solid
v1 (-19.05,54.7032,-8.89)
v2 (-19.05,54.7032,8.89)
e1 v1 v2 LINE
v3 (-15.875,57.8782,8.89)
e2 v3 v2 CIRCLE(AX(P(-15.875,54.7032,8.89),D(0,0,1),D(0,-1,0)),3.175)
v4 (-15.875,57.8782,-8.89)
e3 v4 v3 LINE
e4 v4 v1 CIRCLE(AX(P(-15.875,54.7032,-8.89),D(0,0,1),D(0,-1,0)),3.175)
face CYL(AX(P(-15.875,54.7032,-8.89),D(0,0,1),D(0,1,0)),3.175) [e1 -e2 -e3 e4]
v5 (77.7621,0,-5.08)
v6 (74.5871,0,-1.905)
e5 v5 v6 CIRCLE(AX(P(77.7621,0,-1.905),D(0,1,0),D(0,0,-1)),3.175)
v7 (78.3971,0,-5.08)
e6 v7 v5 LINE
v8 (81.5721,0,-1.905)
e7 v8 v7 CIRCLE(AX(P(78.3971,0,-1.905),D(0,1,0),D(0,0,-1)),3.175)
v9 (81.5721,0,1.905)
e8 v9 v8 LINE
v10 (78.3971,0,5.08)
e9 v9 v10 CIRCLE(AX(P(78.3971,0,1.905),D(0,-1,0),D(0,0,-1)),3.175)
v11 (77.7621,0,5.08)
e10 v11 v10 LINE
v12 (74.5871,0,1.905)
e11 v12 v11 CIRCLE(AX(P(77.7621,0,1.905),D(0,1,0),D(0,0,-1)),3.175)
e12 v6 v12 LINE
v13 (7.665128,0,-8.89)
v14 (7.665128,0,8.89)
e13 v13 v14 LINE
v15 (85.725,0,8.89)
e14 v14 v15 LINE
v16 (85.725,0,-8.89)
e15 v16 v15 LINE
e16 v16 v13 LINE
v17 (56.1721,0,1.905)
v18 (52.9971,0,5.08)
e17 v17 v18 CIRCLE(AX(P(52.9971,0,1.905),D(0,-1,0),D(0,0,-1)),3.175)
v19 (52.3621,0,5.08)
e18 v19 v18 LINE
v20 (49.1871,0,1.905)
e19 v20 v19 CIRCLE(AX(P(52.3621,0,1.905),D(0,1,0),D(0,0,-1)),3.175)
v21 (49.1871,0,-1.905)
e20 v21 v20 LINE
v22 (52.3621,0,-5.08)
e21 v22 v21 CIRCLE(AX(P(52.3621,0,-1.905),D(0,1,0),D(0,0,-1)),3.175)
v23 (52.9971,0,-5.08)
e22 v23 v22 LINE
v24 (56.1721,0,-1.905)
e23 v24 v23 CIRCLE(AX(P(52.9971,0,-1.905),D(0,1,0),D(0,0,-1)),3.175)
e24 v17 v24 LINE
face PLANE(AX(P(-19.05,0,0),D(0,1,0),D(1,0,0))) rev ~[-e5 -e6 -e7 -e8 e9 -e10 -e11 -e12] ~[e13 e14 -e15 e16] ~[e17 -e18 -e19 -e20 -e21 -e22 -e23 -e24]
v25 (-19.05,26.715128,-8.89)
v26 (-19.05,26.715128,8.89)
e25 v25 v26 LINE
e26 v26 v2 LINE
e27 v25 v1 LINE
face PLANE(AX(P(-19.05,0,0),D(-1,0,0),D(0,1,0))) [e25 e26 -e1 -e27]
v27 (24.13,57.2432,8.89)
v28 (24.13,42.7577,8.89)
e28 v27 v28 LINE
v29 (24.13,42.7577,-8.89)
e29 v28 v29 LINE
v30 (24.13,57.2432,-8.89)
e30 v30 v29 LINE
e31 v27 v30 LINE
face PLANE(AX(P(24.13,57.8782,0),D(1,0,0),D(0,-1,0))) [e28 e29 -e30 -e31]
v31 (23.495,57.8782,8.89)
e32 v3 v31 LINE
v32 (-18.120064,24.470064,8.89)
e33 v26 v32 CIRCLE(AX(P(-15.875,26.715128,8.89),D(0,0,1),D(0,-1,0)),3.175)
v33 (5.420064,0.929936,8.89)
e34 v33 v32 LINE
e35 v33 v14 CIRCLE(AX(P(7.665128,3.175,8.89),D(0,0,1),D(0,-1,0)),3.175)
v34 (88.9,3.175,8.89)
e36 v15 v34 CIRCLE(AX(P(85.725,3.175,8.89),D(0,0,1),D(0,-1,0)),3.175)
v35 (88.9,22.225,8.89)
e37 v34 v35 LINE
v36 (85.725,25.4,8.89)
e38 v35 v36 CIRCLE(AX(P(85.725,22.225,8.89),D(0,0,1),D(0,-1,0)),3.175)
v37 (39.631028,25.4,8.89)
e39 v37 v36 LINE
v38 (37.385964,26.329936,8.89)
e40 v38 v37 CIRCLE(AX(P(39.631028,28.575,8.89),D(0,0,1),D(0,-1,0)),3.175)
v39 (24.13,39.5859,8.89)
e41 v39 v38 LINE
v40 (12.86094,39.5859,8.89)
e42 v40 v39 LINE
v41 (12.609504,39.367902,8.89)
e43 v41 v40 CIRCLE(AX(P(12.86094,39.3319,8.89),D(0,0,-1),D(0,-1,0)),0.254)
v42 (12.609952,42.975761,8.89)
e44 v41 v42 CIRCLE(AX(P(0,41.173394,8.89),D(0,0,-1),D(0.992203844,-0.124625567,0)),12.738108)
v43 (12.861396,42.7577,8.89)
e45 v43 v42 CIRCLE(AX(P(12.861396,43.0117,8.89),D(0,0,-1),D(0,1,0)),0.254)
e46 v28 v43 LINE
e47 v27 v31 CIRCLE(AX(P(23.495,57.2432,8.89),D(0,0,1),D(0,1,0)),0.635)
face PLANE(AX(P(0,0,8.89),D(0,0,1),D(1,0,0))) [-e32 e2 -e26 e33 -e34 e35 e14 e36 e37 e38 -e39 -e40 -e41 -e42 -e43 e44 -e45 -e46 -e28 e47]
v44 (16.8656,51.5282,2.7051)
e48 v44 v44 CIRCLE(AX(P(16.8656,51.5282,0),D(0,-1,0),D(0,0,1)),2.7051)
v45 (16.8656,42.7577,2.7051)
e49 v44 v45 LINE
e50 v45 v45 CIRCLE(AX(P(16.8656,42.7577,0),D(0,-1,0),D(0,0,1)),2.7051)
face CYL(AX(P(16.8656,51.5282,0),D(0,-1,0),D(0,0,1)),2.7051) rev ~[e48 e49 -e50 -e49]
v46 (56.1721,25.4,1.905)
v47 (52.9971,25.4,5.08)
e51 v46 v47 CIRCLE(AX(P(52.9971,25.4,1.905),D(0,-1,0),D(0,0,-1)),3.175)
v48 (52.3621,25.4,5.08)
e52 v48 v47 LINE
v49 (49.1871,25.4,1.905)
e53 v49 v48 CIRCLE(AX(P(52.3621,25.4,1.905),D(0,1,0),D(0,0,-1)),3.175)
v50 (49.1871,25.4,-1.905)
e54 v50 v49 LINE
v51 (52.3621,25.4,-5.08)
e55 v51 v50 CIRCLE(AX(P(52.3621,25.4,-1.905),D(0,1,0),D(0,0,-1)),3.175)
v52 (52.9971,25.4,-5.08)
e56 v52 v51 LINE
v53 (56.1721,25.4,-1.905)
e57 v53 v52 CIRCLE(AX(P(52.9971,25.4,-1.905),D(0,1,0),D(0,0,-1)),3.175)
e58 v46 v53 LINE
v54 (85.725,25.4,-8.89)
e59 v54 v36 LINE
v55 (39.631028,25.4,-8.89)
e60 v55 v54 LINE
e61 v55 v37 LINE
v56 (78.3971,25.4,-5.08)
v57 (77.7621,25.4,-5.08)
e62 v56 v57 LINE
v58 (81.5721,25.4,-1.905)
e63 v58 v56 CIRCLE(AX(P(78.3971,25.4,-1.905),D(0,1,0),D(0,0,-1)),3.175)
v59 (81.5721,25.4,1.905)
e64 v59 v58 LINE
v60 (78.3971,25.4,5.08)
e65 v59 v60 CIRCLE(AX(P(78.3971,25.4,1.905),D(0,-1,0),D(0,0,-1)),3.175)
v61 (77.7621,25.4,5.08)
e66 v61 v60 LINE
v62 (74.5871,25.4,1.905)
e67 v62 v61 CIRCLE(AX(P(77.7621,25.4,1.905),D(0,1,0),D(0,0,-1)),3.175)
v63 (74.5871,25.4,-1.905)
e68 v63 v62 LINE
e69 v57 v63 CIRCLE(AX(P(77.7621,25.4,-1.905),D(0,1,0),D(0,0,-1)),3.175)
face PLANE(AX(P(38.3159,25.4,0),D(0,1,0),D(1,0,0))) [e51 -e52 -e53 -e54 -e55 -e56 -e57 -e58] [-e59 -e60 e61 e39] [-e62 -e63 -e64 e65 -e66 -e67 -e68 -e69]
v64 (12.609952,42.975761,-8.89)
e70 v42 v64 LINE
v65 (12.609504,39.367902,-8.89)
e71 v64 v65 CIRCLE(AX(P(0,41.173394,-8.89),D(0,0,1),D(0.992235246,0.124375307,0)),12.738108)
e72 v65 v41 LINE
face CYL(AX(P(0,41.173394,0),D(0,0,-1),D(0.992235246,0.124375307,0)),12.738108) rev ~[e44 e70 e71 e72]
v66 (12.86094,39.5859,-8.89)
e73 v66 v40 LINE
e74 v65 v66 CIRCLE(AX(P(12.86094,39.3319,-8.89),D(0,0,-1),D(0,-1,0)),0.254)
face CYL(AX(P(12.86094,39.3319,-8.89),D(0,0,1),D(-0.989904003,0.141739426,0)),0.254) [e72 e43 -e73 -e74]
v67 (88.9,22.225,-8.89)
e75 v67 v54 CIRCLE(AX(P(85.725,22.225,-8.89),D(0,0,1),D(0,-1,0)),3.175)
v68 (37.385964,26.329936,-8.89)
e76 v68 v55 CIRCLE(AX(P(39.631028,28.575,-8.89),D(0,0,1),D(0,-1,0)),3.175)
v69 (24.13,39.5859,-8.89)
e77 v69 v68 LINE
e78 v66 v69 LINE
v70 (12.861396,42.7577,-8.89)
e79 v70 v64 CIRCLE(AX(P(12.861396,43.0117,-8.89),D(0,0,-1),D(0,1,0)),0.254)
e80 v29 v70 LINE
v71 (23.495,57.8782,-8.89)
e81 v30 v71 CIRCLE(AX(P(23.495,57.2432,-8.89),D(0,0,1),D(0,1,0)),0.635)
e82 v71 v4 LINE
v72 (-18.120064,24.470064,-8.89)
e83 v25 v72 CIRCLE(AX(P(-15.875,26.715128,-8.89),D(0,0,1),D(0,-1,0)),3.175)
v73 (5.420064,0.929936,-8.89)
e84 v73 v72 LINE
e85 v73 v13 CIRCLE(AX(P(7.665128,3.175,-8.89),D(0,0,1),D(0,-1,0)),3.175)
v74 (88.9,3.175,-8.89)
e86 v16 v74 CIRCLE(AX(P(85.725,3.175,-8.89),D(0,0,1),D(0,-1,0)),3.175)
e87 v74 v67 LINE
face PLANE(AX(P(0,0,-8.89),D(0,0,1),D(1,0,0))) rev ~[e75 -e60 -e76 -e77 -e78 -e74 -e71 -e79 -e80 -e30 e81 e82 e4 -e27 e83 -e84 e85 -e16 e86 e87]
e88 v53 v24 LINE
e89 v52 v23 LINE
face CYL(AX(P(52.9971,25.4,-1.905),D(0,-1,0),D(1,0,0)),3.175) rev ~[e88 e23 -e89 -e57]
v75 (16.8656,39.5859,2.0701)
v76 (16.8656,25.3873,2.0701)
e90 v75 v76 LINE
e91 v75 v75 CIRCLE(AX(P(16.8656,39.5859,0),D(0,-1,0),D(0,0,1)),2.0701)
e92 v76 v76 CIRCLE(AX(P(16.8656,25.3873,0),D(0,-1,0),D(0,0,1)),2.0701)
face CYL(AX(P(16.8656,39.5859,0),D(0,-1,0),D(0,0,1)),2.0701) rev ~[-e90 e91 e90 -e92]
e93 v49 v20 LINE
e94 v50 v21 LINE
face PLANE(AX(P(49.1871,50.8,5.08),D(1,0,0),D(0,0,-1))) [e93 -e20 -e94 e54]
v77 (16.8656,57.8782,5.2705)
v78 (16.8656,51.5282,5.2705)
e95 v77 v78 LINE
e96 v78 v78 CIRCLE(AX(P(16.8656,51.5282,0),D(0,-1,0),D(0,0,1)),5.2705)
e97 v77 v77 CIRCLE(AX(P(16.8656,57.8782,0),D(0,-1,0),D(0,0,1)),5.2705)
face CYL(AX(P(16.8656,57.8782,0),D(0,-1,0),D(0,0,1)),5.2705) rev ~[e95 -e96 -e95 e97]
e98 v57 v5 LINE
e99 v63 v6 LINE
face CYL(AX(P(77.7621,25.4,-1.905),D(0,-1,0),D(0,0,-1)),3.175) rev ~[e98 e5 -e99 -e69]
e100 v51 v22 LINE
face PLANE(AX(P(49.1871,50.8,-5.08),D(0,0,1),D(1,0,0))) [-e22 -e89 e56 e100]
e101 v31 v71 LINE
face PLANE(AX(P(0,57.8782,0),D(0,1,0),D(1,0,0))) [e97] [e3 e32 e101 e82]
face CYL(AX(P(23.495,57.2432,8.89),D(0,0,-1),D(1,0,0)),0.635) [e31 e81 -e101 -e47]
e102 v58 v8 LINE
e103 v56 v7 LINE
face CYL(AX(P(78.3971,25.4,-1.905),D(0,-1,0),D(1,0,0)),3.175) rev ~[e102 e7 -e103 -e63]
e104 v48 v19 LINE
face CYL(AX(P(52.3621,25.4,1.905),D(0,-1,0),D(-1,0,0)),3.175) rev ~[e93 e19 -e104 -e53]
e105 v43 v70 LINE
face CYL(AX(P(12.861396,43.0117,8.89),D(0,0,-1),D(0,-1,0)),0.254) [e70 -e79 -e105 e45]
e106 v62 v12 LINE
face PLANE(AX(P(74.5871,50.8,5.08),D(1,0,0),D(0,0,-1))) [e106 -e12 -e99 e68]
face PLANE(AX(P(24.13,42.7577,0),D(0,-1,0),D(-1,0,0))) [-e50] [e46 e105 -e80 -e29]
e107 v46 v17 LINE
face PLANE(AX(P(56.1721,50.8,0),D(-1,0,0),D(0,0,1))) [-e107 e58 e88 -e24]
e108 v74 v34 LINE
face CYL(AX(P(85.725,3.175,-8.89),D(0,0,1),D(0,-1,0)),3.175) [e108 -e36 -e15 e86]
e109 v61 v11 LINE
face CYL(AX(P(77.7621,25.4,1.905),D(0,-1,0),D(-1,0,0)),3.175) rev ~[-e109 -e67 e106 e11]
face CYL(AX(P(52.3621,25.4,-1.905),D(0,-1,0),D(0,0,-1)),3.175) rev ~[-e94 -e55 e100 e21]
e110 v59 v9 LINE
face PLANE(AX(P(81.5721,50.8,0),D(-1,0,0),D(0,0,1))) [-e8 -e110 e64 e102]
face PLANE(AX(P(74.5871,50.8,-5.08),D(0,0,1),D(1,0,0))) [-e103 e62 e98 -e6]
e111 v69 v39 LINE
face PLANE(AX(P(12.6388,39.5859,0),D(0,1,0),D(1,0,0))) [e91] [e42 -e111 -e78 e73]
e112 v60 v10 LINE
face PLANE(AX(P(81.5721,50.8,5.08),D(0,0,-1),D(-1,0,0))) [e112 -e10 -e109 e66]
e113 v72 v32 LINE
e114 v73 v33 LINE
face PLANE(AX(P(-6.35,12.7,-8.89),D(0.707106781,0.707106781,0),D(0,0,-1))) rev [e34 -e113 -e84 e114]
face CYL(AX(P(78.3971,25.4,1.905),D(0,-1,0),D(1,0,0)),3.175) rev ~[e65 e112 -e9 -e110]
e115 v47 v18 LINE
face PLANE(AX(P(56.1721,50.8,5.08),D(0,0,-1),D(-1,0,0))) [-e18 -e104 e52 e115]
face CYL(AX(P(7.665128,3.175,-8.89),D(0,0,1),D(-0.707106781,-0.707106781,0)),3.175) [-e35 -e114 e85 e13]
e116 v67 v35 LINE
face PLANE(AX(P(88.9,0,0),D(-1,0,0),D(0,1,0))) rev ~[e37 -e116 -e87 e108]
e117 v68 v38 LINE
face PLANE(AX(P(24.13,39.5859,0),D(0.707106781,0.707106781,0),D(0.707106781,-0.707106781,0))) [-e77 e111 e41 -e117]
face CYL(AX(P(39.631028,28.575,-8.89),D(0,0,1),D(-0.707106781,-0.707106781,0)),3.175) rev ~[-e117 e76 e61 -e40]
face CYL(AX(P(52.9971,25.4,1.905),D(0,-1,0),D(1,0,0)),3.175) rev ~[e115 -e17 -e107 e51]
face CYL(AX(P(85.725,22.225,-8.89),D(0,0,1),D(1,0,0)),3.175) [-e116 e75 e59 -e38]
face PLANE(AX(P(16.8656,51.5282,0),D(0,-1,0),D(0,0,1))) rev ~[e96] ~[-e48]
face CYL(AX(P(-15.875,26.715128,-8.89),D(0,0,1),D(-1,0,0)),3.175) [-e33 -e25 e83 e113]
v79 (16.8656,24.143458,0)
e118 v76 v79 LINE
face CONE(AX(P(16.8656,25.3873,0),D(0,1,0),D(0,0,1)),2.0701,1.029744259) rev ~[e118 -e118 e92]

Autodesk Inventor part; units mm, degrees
ref_plane "YZ Plane" through (0, 0, 0) normal (1, 0, 0) x (0, 1, 0)
sketch "Sketch1" plane through (0, 0, 0) normal (0, 0, 1) x (1, 0, 0)
  line L0 (0, 71.9938) -> (0, -26.8156) projected
  line L1 (-40.64, 0) -> (110.49, 0) projected
  line L2 (-19.05, 0) -> (-19.05, 57.8782)
  line L3 (24.13, 57.8782) -> (24.13, 39.5859)
  line L4 (-19.05, 0) -> (88.9, 0)
  line L5 (88.9, 0) -> (88.9, 25.4)
  line L6 (0, 41.1734) -> (24.13, 41.1734) construction
  line L7 (12.6388, 39.5859) -> (24.13, 39.5859)
  line L8 (24.13, 39.5859) -> (24.13, 42.7577)
  line L9 (24.13, 42.7577) -> (12.6392, 42.7577)
  line L10 (4.9628, 39.5889) -> (24.13, 42.7577) construction
  line L11 (24.13, 39.5859) -> (4.9638, 42.7609) construction
  line L12 (39.9796, 0) -> (88.9, 0) construction
  line L13 (88.9, 0) -> (88.9, -12.7) construction
  line L14 (88.9, -12.7) -> (39.9796, -12.7) construction
  line L15 (39.9796, -12.7) -> (39.9796, 0) construction
  line L16 (52.6796, -12.7) -> (52.6796, 0) construction
  line L17 (78.0796, -12.7) -> (78.0796, 0) construction
  line L18 (38.3159, 25.4) -> (88.9, 25.4)
  line L19 (16.8601, 41.1734) -> (16.8601, 57.8782) construction
  line L20 (12.7635, 41.1734) -> (12.7635, 34.371) construction
  line L21 (24.13, 39.5859) -> (38.3159, 25.4)
  line L22 (-19.05, 57.8782) -> (24.13, 57.8782)
  arc A0 (12.6392, 42.7577) -> (12.6388, 39.5859) centre (0, 41.1734) ccw
  point P0 (14.5469, 41.1734)
  dimension "d1" = 41.1734
  dimension "d3" = 107.95
  dimension "d4" = 25.4
  dimension "d7" = 24.13
  dimension "d13" = 19.05
  dimension "d15" = 39.9796
  dimension "d16" = 0
  dimension "d17" = 12.7
  dimension "d18" = 12.7
  dimension "d19" = 25.4
  dimension "d20" = 52.6796
  dimension "d39" = 16.8601
  dimension "d49" = 135
  dimension "d75" = 12.7381
extrude "Extrusion1" add sketch "Sketch1" along normal mid plane 17.78 contours L22 L3 L9 A0 L0 | L0 A0 L1 L2 L22 | A0 L7 L21 L18 L5 L1 L0
ref_plane "Work Plane1" through (0, 50.8, 0) normal (0, 1, 0) x (-1, 0, 0)
sketch "Sketch2" plane through (0, 50.8, 0) normal (0, 1, 0) x (-1, 0, 0)
  line L0 (0, -7.112) -> (0, 7.112) projected
  line L1 (-97.8865, 0) -> (16.3144, 0) projected
  line L2 (-56.1721, 5.08) -> (-49.1871, 5.08)
  line L3 (-49.1871, 5.08) -> (-49.1871, -5.08)
  line L4 (-49.1871, -5.08) -> (-56.1721, -5.08)
  line L5 (-56.1721, -5.08) -> (-56.1721, 5.08)
  line L6 (-56.1721, 5.08) -> (-49.1871, -5.08) construction
  line L7 (-49.1871, 5.08) -> (-56.1721, -5.08) construction
  line L8 (-81.5721, 5.08) -> (-74.5871, 5.08)
  line L9 (-74.5871, 5.08) -> (-74.5871, -5.08)
  line L10 (-74.5871, -5.08) -> (-81.5721, -5.08)
  line L11 (-81.5721, -5.08) -> (-81.5721, 5.08)
  line L12 (-81.5721, 5.08) -> (-74.5871, -5.08) construction
  line L13 (-74.5871, 5.08) -> (-81.5721, -5.08) construction
  point P0 (0, 0)
  point P1 (-52.6796, 0)
  point P2 (-78.0796, 0)
  dimension "d22" = 52.6796
  dimension "d23" = 25.4
  dimension "d24" = 10.16
  dimension "d25" = 6.985
extrude "Extrusion2" cut sketch "Sketch2" against normal up to next
sketch "Sketch3" plane through (0, 0, 0) normal (0, 0, 1) x (1, 0, 0)
  point P0 (0, 0)
fillet "Fillet1" radius 3.175 8 edges at (49.1871, 12.7, -5.08) (56.1721, 12.7, -5.08) (56.1721, 12.7, 5.08) (49.1871, 12.7, 5.08) (74.5871, 12.7, 5.08) (74.5871, 12.7, -5.08) (81.5721, 12.7, -5.08) (81.5721, 12.7, 5.08)
sketch "Sketch4" plane through (-19.05, 57.8782, 8.89) normal (0, 1, 0) x (1, 0, 0)
  line L0 (129.5216, 7.8564) -> (-21.59, 9.525)
  line L1 (43.18, 19.05) -> (43.18, 0)
  line L2 (19.05, 22.86) -> (19.05, -3.81)
  line L3 (116.9365, 8.89) -> (2.7356, 8.89) projected
  point P0 (19.05, 9.525)
  point P1 (129.5216, 7.8564)
  point P2 (-21.59, 9.525)
  point P3 (35.9156, 8.89)
  dimension "d38" = 16.8656
  dimension "d79" = 0
sketch "Sketch5" plane through (-19.05, 57.8782, 8.89) normal (0, 1, 0) x (1, 0, 0)
  point P0 (19.05, 9.525)
hole "Hole2" at (16.8656, 57.8782, 0) direction (0, -1, 0) diameter 5.4102 end up to surface counterbore diameter 10.541 counterbore depth 6.35
chamfer "Chamfer1" distance 25.4 angle 45 1 edges at (-19.05, 0, 0)
sketch "Sketch6" plane through (0, 0, 0) normal (1, 0, 0) x (0, 1, 0)
  line L0 (41.1734, -12.446) -> (41.1734, 12.446) projected
  line L1 (-11.5756, 0) -> (69.4538, 0) projected
  line L2 (28.4353, -4.7625) -> (28.1813, -4.7625)
  line L3 (28.1813, -4.7625) -> (28.1813, 4.7625)
  line L4 (28.1813, 4.7625) -> (28.4353, 4.7625)
  line L5 (28.4353, 4.7625) -> (28.4353, -4.7625)
  line L6 (28.4353, -4.7625) -> (28.1813, 4.7625) construction
  line L7 (28.1813, -4.7625) -> (28.4353, 4.7625) construction
  line L8 (28.4353, 8.89) -> (28.4353, -8.89) projected
  line L9 (57.8782, -8.89) -> (42.7577, -8.89) projected
  line L10 (42.7577, 8.89) -> (57.8782, 8.89) projected
  point P0 (0, 0)
  point P1 (28.3083, 0)
  dimension "d53" = 0
  dimension "d54" = 9.525
  dimension "d55" = 0.254
  dimension "d56" = 17.78
revolve "Revolution1" [suppressed]
hole "Hole3" at (16.8656, 39.5859, 0) direction (0, -1, 0) diameter 4.1402 depth 14.1986 tip angle 118
fillet "Fillet2" radius 0.254 2 edges at (12.6392, 42.7577, 0) (12.6388, 39.5859, 0)
fillet "Fillet3" radius 0.635 1 edges at (24.13, 57.8782, 0)
fillet "Fillet4" radius 3.175 5 edges at (-19.05, 57.8782, 0) (-19.05, 25.4, 0) (6.35, 0, 0) (88.9, 25.4, 0) (88.9, 0, 0)
chamfer "Chamfer2" [suppressed]
fillet "Fillet5" radius 3.175 1 edges at (38.3159, 25.4, 0)
properties part number "J005363" material "ALUMINUM, 6061-T651"
